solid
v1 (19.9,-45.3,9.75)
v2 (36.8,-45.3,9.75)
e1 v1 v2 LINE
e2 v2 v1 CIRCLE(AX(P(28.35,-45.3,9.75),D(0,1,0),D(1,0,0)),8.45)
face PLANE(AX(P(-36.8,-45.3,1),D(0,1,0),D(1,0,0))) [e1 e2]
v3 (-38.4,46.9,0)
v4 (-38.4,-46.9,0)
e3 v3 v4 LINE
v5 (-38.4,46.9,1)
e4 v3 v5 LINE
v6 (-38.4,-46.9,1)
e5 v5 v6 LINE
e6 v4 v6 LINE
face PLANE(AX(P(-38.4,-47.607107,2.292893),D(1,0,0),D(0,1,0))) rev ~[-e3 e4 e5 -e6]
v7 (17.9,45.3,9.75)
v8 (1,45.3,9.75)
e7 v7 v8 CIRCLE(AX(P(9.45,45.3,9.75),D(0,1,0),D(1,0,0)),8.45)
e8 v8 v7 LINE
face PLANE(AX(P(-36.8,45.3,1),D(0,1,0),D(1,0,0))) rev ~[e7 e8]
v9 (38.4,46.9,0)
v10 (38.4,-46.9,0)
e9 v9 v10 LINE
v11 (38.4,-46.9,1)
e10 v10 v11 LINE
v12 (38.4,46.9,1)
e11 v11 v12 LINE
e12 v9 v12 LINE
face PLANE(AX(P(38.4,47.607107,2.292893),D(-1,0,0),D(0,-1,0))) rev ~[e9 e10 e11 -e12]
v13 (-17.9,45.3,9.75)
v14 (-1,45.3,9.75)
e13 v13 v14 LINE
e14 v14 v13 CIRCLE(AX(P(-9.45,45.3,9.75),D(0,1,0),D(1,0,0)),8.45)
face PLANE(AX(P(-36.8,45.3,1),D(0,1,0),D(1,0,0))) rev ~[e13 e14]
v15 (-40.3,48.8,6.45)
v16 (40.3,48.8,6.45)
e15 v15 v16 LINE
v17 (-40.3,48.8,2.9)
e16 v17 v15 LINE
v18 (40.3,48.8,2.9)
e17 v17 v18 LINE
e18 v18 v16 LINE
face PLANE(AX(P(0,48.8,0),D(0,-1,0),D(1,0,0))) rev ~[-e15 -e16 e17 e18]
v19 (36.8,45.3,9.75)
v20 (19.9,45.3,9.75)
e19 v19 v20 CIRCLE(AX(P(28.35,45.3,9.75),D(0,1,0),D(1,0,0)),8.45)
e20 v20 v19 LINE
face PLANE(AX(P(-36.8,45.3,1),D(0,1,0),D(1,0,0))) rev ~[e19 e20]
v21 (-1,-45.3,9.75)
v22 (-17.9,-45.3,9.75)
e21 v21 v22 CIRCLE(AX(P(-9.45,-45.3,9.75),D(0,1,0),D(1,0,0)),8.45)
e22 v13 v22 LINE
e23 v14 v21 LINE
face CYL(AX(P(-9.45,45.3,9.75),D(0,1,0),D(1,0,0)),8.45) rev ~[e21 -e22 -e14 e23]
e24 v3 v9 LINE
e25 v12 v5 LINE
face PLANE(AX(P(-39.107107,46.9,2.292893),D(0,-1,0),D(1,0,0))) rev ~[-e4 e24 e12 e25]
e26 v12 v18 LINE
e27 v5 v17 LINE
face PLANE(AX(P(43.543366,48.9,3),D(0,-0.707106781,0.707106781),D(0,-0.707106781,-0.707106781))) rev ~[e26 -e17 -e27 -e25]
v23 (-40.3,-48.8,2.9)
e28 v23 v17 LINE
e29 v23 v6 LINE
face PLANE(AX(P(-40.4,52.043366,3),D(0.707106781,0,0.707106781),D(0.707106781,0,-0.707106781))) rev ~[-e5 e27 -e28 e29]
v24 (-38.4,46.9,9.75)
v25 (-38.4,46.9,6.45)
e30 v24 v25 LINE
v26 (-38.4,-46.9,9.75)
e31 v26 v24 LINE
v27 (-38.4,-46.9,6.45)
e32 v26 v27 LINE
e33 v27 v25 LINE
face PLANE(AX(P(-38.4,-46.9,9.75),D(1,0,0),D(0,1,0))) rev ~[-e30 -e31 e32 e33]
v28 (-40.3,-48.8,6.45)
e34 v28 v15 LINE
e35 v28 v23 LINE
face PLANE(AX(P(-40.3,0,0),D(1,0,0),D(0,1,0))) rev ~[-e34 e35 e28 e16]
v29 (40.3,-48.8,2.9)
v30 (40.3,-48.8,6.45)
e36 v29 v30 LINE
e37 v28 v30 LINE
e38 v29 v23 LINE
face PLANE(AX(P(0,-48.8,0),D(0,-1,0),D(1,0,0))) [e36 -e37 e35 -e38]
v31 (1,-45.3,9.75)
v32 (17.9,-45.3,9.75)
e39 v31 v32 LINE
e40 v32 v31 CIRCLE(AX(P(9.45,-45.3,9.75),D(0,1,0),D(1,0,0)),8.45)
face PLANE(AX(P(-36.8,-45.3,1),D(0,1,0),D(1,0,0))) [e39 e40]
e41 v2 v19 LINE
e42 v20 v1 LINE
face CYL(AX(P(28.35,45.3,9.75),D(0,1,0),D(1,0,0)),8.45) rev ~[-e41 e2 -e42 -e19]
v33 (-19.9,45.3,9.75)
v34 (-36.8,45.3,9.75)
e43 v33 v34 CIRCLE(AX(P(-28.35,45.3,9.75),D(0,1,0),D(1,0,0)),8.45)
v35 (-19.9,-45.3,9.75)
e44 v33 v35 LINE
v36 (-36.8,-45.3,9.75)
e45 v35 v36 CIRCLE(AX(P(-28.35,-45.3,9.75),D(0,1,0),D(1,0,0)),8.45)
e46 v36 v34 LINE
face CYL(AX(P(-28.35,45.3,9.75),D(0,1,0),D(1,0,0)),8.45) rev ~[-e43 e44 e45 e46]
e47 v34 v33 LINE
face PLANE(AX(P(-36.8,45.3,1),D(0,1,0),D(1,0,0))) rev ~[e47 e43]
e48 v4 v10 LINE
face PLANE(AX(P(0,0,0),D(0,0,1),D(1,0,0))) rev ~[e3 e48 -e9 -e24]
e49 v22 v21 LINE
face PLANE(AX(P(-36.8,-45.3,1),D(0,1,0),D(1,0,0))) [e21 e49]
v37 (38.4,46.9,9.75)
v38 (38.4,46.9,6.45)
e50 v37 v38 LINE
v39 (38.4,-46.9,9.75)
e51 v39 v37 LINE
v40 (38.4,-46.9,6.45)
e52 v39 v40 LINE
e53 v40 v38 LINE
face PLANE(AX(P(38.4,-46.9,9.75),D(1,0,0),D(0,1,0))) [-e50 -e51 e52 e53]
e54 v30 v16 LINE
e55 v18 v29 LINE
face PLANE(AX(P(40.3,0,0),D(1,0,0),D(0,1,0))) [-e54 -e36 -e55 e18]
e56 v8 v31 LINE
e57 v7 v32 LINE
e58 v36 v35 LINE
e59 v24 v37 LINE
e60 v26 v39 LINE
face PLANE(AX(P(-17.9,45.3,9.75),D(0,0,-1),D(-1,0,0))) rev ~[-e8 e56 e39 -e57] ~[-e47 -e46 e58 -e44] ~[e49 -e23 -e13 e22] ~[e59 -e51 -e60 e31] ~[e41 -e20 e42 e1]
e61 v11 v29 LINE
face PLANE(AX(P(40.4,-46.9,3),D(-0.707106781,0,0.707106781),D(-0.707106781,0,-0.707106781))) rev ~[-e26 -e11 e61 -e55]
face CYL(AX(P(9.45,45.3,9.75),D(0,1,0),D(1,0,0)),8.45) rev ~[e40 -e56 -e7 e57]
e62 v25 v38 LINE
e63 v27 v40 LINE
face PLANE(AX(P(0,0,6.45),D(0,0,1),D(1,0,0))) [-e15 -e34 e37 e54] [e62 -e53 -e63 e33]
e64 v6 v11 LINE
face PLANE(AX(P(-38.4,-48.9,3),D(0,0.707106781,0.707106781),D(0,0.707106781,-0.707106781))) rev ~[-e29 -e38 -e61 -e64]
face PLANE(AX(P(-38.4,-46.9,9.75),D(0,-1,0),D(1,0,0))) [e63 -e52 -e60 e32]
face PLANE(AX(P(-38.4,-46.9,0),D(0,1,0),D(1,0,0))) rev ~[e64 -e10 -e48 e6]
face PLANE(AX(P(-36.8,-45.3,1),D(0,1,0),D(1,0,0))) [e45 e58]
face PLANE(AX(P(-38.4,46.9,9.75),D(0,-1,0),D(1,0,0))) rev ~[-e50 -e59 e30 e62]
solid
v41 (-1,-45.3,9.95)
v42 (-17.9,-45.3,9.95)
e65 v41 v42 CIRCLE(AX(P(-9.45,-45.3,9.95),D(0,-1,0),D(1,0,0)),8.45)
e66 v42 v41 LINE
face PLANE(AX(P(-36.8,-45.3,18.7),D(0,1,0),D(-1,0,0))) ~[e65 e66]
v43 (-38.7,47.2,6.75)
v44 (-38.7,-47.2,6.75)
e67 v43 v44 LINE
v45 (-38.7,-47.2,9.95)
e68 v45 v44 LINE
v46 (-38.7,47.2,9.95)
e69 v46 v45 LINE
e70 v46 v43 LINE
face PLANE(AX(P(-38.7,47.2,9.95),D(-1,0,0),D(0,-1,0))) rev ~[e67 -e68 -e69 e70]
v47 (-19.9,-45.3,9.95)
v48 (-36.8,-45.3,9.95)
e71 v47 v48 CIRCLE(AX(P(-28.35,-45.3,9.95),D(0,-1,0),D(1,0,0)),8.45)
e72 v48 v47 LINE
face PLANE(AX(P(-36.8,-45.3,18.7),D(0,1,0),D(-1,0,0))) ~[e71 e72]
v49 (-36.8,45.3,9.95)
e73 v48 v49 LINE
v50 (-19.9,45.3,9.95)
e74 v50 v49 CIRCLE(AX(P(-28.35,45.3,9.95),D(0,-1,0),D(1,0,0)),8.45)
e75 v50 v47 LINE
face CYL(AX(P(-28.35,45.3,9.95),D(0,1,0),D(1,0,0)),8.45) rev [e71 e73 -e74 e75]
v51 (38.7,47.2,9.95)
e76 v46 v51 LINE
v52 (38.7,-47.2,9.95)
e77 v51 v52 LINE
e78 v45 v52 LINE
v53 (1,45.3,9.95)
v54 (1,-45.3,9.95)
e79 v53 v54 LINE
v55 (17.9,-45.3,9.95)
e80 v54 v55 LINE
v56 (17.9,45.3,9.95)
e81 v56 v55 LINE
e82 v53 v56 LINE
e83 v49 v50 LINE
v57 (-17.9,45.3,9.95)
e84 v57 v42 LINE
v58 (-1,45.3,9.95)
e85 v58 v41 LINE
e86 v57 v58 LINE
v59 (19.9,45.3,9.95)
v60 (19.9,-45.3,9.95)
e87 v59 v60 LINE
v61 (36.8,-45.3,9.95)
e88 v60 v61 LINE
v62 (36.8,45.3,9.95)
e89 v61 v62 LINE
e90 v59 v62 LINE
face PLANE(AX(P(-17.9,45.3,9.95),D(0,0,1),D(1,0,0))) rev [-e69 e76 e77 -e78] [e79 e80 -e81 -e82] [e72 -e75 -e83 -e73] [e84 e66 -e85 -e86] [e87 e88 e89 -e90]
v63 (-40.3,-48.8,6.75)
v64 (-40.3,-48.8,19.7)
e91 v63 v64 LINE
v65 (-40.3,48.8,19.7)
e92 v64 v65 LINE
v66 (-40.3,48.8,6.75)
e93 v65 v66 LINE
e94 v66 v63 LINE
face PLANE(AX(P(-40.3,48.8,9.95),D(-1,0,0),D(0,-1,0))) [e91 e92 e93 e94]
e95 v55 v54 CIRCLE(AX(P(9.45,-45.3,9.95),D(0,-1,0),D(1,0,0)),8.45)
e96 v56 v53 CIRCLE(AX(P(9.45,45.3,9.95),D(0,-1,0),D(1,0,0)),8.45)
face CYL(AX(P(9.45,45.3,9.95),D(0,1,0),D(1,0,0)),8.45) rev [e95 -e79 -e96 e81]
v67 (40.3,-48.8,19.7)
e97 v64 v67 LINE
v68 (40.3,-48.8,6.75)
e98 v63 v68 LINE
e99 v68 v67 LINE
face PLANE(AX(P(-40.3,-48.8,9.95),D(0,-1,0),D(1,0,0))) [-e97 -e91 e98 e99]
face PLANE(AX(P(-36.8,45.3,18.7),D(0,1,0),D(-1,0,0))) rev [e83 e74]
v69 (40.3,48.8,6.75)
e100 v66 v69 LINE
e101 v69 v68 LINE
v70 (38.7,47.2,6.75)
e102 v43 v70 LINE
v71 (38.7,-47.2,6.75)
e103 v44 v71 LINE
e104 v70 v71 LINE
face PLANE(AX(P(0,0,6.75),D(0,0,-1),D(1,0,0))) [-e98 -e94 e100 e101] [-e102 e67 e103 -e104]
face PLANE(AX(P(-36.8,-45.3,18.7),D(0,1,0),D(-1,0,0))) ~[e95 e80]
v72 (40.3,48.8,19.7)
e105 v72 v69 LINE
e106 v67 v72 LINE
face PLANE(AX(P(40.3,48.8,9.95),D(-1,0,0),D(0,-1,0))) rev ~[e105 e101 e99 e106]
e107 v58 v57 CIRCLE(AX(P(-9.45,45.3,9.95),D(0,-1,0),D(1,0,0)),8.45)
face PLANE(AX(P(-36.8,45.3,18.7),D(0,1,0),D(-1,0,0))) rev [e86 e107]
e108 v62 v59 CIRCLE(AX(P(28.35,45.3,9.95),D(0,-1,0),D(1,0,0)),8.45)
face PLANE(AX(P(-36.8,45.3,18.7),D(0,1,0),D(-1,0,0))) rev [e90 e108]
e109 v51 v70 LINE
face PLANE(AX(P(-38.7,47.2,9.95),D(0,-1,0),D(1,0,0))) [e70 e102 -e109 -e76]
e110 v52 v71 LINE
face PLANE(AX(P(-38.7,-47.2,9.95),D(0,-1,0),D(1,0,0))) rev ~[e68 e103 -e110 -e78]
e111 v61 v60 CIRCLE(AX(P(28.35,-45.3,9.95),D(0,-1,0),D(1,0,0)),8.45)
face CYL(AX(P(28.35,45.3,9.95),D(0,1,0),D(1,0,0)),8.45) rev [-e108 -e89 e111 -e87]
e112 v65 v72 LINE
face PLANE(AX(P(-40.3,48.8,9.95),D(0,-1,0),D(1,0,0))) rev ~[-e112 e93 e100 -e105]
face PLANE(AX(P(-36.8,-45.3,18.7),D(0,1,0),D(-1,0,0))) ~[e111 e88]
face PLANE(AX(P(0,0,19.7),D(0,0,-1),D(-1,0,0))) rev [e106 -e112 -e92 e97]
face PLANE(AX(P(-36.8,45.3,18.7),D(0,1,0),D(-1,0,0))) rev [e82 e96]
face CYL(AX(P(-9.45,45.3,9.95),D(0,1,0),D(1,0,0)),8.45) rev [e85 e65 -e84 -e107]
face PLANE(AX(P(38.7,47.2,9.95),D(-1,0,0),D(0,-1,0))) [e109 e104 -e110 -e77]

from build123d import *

# Parameters (mm, degrees)
F3_W          = 80.6
F3_H          = 97.6
F4_DEPTH      = 1
F5_W          = 80.6
F5_H          = 97.6
F5_W_2        = 73.6
F5_H_2        = 90.6
F6_DEPTH      = 8.75
F8_DEPTH      = 90.6
F11_W         = 80.6
F11_H         = 97.6
F11_W_2       = 76.8
F11_H_2       = 93.8
F13_DEPTH     = 3.3
F14_W         = 80.6
F14_H         = 97.6
F14_W_2       = 76.8
F14_H_2       = 93.8
F15_DEPTH     = 3
F16_T4_DEPTH  = 76.8
F16_T9_DEPTH  = 93.8
F16_T14_DEPTH = 76.8
F16_T19_DEPTH = 93.8
F16_T25_DEPTH = 81.9433659759
F16_T31_DEPTH = 98.9433659759
F16_T40_DEPTH = 81.9433659759
F16_T46_DEPTH = 98.9433659759
F16_T55_DEPTH = 81.9433659759
F16_T61_DEPTH = 98.9433659759
F16_T70_DEPTH = 98.9433659759
F16_T76_DEPTH = 81.9433659759
F17_W         = 80.6
F17_H         = 97.6
F17_W_2       = 77.4
F17_H_2       = 94.4
F18_DEPTH     = 3.2


# Not quite as in the source:
# - a fillet or chamfer that OpenCascade refuses, or shapes differently, is made with other operations: its cross-section is extruded or revolved along the edge and cut away or added


with BuildPart() as f4:
    # F3 (on Top) → F4 (new body)
    with BuildSketch(Plane.XY):
        Rectangle(F3_W, F3_H)
    extrude(amount=F4_DEPTH)

    # F5 (on face) → F6 (join)
    with BuildSketch(Plane.XY.offset(1)):
        Rectangle(F5_W, F5_H)
        Rectangle(F5_W_2, F5_H_2, mode=Mode.SUBTRACT)
    extrude(amount=F6_DEPTH)

    # F7 (on face) → F8 (join, through all)
    with BuildSketch(Plane.XZ.offset(-45.3)):
        with BuildLine():
            ThreePointArc((-19.9, 9.75), (-28.35, 1.3), (-36.8, 9.75))
            Line((-36.8, 9.75), (-36.8, 1))
            Line((-36.8, 1), (36.8, 1))
            Line((36.8, 1), (36.8, 9.75))
            ThreePointArc((36.8, 9.75), (28.35, 1.3), (19.9, 9.75))
            Line((19.9, 9.75), (17.9, 9.75))
            ThreePointArc((17.9, 9.75), (9.45, 1.3), (1, 9.75))
            Line((1, 9.75), (-1, 9.75))
            ThreePointArc((-1, 9.75), (-9.45, 1.3), (-17.9, 9.75))
            Line((-17.9, 9.75), (-19.9, 9.75))
        make_face()
    extrude(amount=F8_DEPTH)


with BuildPart() as f10_1:
    # F10: instance of F4
    add(f4.part.mirror(Plane.XY.offset(9.85)))

    # F17 (on face) → F18 (join)
    with BuildSketch(Plane(origin=(0, 0, 9.95), x_dir=(1, 0, 0), z_dir=(0, 0, -1))):
        Rectangle(F17_W, F17_H)
        Rectangle(F17_W_2, F17_H_2, mode=Mode.SUBTRACT)
    extrude(amount=F18_DEPTH)


with BuildPart() as f4_1:
    add(f4.part)

    # F11 (on face) → F13 (cut)
    with BuildSketch(Plane.XY.offset(9.75)):
        Rectangle(F11_W, F11_H)
        Rectangle(F11_W_2, F11_H_2, mode=Mode.SUBTRACT)
    extrude(amount=-F13_DEPTH, mode=Mode.SUBTRACT)

    # F14 (on face) → F15 (cut)
    with BuildSketch(Plane(origin=(0, 0, 0), x_dir=(1, 0, 0), z_dir=(0, 0, -1))):
        Rectangle(F14_W, F14_H)
        Rectangle(F14_W_2, F14_H_2, mode=Mode.SUBTRACT)
    extrude(amount=-F15_DEPTH, mode=Mode.SUBTRACT)

    # F16: chamfer of 2 on 4 edges, made by hand


with BuildPart() as f16_tool2:
    # F16_s3 → F16_t4 (new body)
    with BuildSketch(Plane.YZ.offset(-38.4)):
        Polygon((-48.9, 3), (-46.9, 1), (-46.9, 3), align=None)
    extrude(amount=F16_T4_DEPTH)

    split(bisect_by=Plane.XZ.offset(48.8), keep=Keep.BOTTOM)


with BuildPart() as f4_2:
    add(f4_1.part)

    # F16_t1: union F16_tool2
    add(f16_tool2.part)


with BuildPart() as f16_tool7:
    # F16_s8 → F16_t9 (new body)
    with BuildSketch(Plane.XZ.offset(-46.9)):
        Polygon((-40.4, 3), (-38.4, 1), (-38.4, 3), align=None)
    extrude(amount=F16_T9_DEPTH)

    split(bisect_by=Plane.YZ.offset(-40.3), keep=Keep.TOP)


with BuildPart() as f4_3:
    add(f4_2.part)

    # F16_t6: union F16_tool7
    add(f16_tool7.part)


with BuildPart() as f16_tool12:
    # F16_s13 → F16_t14 (new body)
    with BuildSketch(Plane.YZ.offset(38.4)):
        Polygon((48.9, 3), (46.9, 1), (46.9, 3), align=None)
    extrude(amount=-F16_T14_DEPTH)

    split(bisect_by=Plane.XZ.offset(-48.8), keep=Keep.TOP)


with BuildPart() as f4_4:
    add(f4_3.part)

    # F16_t11: union F16_tool12
    add(f16_tool12.part)


with BuildPart() as f16_tool17:
    # F16_s18 → F16_t19 (new body)
    with BuildSketch(Plane.XZ.offset(46.9)):
        Polygon((40.4, 3), (38.4, 1), (38.4, 3), align=None)
    extrude(amount=-F16_T19_DEPTH)

    split(bisect_by=Plane.YZ.offset(40.3), keep=Keep.BOTTOM)


with BuildPart() as f4_5:
    add(f4_4.part)

    # F16_t16: union F16_tool17
    add(f16_tool17.part)


with BuildPart() as f16_tool23:
    # F16_s24 → F16_t25 (new body)
    with BuildSketch(Plane.YZ.offset(-43.5433659759)):
        Polygon((-48.9, 3), (-46.9, 1), (-46.9, 3), align=None)
    extrude(amount=F16_T25_DEPTH)

    split(bisect_by=Plane.XZ.offset(48.8), keep=Keep.BOTTOM)

    split(bisect_by=Plane.YZ.offset(-40.3), keep=Keep.TOP)

    split(bisect_by=Plane.YZ.offset(-38.4), keep=Keep.BOTTOM)


with BuildPart() as f16_tool29:
    # F16_s30 → F16_t31 (new body)
    with BuildSketch(Plane.XZ.offset(-46.9)):
        Polygon((-40.4, 3), (-38.4, 1), (-38.4, 3), align=None)
    extrude(amount=F16_T31_DEPTH)

    split(bisect_by=Plane.XZ.offset(48.8), keep=Keep.BOTTOM)

    split(bisect_by=Plane.YZ.offset(-40.3), keep=Keep.TOP)

    split(bisect_by=Plane.XZ.offset(46.9), keep=Keep.TOP)


with BuildPart() as f16_tool23_1:
    add(f16_tool23.part)

    # F16_t35: intersect F16_tool29
    add(f16_tool29.part, mode=Mode.INTERSECT)


with BuildPart() as f4_6:
    add(f4_5.part)

    # F16_t21: union F16_tool23
    add(f16_tool23_1.part)


with BuildPart() as f16_tool38:
    # F16_s39 → F16_t40 (new body)
    with BuildSketch(Plane.YZ.offset(-38.4)):
        Polygon((-48.9, 3), (-46.9, 1), (-46.9, 3), align=None)
    extrude(amount=F16_T40_DEPTH)

    split(bisect_by=Plane.XZ.offset(48.8), keep=Keep.BOTTOM)

    split(bisect_by=Plane.YZ.offset(40.3), keep=Keep.BOTTOM)

    split(bisect_by=Plane.YZ.offset(38.4), keep=Keep.TOP)


with BuildPart() as f16_tool44:
    # F16_s45 → F16_t46 (new body)
    with BuildSketch(Plane.XZ.offset(52.0433659759)):
        Polygon((40.4, 3), (38.4, 1), (38.4, 3), align=None)
    extrude(amount=-F16_T46_DEPTH)

    split(bisect_by=Plane.XZ.offset(48.8), keep=Keep.BOTTOM)

    split(bisect_by=Plane.YZ.offset(40.3), keep=Keep.BOTTOM)

    split(bisect_by=Plane.XZ.offset(46.9), keep=Keep.TOP)


with BuildPart() as f16_tool38_1:
    add(f16_tool38.part)

    # F16_t50: intersect F16_tool44
    add(f16_tool44.part, mode=Mode.INTERSECT)


with BuildPart() as f4_7:
    add(f4_6.part)

    # F16_t36: union F16_tool38
    add(f16_tool38_1.part)


with BuildPart() as f16_tool53:
    # F16_s54 → F16_t55 (new body)
    with BuildSketch(Plane.YZ.offset(38.4)):
        Polygon((48.9, 3), (46.9, 1), (46.9, 3), align=None)
    extrude(amount=-F16_T55_DEPTH)

    split(bisect_by=Plane.YZ.offset(-40.3), keep=Keep.TOP)

    split(bisect_by=Plane.XZ.offset(-48.8), keep=Keep.TOP)

    split(bisect_by=Plane.YZ.offset(-38.4), keep=Keep.BOTTOM)


with BuildPart() as f16_tool59:
    # F16_s60 → F16_t61 (new body)
    with BuildSketch(Plane.XZ.offset(-52.0433659759)):
        Polygon((-40.4, 3), (-38.4, 1), (-38.4, 3), align=None)
    extrude(amount=F16_T61_DEPTH)

    split(bisect_by=Plane.YZ.offset(-40.3), keep=Keep.TOP)

    split(bisect_by=Plane.XZ.offset(-48.8), keep=Keep.TOP)

    split(bisect_by=Plane.XZ.offset(-46.9), keep=Keep.BOTTOM)


with BuildPart() as f16_tool53_1:
    add(f16_tool53.part)

    # F16_t65: intersect F16_tool59
    add(f16_tool59.part, mode=Mode.INTERSECT)


with BuildPart() as f4_8:
    add(f4_7.part)

    # F16_t51: union F16_tool53
    add(f16_tool53_1.part)


with BuildPart() as f16_tool68:
    # F16_s69 → F16_t70 (new body)
    with BuildSketch(Plane.XZ.offset(46.9)):
        Polygon((40.4, 3), (38.4, 1), (38.4, 3), align=None)
    extrude(amount=-F16_T70_DEPTH)

    split(bisect_by=Plane.YZ.offset(40.3), keep=Keep.BOTTOM)

    split(bisect_by=Plane.XZ.offset(-48.8), keep=Keep.TOP)

    split(bisect_by=Plane.XZ.offset(-46.9), keep=Keep.BOTTOM)


with BuildPart() as f16_tool74:
    # F16_s75 → F16_t76 (new body)
    with BuildSketch(Plane.YZ.offset(43.5433659759)):
        Polygon((48.9, 3), (46.9, 1), (46.9, 3), align=None)
    extrude(amount=-F16_T76_DEPTH)

    split(bisect_by=Plane.YZ.offset(40.3), keep=Keep.BOTTOM)

    split(bisect_by=Plane.XZ.offset(-48.8), keep=Keep.TOP)

    split(bisect_by=Plane.YZ.offset(38.4), keep=Keep.TOP)


with BuildPart() as f16_tool68_1:
    add(f16_tool68.part)

    # F16_t80: intersect F16_tool74
    add(f16_tool74.part, mode=Mode.INTERSECT)


with BuildPart() as f4_9:
    add(f4_8.part)

    # F16_t66: union F16_tool68
    add(f16_tool68_1.part)


solid = Compound([f10_1.part, f4_9.part])
